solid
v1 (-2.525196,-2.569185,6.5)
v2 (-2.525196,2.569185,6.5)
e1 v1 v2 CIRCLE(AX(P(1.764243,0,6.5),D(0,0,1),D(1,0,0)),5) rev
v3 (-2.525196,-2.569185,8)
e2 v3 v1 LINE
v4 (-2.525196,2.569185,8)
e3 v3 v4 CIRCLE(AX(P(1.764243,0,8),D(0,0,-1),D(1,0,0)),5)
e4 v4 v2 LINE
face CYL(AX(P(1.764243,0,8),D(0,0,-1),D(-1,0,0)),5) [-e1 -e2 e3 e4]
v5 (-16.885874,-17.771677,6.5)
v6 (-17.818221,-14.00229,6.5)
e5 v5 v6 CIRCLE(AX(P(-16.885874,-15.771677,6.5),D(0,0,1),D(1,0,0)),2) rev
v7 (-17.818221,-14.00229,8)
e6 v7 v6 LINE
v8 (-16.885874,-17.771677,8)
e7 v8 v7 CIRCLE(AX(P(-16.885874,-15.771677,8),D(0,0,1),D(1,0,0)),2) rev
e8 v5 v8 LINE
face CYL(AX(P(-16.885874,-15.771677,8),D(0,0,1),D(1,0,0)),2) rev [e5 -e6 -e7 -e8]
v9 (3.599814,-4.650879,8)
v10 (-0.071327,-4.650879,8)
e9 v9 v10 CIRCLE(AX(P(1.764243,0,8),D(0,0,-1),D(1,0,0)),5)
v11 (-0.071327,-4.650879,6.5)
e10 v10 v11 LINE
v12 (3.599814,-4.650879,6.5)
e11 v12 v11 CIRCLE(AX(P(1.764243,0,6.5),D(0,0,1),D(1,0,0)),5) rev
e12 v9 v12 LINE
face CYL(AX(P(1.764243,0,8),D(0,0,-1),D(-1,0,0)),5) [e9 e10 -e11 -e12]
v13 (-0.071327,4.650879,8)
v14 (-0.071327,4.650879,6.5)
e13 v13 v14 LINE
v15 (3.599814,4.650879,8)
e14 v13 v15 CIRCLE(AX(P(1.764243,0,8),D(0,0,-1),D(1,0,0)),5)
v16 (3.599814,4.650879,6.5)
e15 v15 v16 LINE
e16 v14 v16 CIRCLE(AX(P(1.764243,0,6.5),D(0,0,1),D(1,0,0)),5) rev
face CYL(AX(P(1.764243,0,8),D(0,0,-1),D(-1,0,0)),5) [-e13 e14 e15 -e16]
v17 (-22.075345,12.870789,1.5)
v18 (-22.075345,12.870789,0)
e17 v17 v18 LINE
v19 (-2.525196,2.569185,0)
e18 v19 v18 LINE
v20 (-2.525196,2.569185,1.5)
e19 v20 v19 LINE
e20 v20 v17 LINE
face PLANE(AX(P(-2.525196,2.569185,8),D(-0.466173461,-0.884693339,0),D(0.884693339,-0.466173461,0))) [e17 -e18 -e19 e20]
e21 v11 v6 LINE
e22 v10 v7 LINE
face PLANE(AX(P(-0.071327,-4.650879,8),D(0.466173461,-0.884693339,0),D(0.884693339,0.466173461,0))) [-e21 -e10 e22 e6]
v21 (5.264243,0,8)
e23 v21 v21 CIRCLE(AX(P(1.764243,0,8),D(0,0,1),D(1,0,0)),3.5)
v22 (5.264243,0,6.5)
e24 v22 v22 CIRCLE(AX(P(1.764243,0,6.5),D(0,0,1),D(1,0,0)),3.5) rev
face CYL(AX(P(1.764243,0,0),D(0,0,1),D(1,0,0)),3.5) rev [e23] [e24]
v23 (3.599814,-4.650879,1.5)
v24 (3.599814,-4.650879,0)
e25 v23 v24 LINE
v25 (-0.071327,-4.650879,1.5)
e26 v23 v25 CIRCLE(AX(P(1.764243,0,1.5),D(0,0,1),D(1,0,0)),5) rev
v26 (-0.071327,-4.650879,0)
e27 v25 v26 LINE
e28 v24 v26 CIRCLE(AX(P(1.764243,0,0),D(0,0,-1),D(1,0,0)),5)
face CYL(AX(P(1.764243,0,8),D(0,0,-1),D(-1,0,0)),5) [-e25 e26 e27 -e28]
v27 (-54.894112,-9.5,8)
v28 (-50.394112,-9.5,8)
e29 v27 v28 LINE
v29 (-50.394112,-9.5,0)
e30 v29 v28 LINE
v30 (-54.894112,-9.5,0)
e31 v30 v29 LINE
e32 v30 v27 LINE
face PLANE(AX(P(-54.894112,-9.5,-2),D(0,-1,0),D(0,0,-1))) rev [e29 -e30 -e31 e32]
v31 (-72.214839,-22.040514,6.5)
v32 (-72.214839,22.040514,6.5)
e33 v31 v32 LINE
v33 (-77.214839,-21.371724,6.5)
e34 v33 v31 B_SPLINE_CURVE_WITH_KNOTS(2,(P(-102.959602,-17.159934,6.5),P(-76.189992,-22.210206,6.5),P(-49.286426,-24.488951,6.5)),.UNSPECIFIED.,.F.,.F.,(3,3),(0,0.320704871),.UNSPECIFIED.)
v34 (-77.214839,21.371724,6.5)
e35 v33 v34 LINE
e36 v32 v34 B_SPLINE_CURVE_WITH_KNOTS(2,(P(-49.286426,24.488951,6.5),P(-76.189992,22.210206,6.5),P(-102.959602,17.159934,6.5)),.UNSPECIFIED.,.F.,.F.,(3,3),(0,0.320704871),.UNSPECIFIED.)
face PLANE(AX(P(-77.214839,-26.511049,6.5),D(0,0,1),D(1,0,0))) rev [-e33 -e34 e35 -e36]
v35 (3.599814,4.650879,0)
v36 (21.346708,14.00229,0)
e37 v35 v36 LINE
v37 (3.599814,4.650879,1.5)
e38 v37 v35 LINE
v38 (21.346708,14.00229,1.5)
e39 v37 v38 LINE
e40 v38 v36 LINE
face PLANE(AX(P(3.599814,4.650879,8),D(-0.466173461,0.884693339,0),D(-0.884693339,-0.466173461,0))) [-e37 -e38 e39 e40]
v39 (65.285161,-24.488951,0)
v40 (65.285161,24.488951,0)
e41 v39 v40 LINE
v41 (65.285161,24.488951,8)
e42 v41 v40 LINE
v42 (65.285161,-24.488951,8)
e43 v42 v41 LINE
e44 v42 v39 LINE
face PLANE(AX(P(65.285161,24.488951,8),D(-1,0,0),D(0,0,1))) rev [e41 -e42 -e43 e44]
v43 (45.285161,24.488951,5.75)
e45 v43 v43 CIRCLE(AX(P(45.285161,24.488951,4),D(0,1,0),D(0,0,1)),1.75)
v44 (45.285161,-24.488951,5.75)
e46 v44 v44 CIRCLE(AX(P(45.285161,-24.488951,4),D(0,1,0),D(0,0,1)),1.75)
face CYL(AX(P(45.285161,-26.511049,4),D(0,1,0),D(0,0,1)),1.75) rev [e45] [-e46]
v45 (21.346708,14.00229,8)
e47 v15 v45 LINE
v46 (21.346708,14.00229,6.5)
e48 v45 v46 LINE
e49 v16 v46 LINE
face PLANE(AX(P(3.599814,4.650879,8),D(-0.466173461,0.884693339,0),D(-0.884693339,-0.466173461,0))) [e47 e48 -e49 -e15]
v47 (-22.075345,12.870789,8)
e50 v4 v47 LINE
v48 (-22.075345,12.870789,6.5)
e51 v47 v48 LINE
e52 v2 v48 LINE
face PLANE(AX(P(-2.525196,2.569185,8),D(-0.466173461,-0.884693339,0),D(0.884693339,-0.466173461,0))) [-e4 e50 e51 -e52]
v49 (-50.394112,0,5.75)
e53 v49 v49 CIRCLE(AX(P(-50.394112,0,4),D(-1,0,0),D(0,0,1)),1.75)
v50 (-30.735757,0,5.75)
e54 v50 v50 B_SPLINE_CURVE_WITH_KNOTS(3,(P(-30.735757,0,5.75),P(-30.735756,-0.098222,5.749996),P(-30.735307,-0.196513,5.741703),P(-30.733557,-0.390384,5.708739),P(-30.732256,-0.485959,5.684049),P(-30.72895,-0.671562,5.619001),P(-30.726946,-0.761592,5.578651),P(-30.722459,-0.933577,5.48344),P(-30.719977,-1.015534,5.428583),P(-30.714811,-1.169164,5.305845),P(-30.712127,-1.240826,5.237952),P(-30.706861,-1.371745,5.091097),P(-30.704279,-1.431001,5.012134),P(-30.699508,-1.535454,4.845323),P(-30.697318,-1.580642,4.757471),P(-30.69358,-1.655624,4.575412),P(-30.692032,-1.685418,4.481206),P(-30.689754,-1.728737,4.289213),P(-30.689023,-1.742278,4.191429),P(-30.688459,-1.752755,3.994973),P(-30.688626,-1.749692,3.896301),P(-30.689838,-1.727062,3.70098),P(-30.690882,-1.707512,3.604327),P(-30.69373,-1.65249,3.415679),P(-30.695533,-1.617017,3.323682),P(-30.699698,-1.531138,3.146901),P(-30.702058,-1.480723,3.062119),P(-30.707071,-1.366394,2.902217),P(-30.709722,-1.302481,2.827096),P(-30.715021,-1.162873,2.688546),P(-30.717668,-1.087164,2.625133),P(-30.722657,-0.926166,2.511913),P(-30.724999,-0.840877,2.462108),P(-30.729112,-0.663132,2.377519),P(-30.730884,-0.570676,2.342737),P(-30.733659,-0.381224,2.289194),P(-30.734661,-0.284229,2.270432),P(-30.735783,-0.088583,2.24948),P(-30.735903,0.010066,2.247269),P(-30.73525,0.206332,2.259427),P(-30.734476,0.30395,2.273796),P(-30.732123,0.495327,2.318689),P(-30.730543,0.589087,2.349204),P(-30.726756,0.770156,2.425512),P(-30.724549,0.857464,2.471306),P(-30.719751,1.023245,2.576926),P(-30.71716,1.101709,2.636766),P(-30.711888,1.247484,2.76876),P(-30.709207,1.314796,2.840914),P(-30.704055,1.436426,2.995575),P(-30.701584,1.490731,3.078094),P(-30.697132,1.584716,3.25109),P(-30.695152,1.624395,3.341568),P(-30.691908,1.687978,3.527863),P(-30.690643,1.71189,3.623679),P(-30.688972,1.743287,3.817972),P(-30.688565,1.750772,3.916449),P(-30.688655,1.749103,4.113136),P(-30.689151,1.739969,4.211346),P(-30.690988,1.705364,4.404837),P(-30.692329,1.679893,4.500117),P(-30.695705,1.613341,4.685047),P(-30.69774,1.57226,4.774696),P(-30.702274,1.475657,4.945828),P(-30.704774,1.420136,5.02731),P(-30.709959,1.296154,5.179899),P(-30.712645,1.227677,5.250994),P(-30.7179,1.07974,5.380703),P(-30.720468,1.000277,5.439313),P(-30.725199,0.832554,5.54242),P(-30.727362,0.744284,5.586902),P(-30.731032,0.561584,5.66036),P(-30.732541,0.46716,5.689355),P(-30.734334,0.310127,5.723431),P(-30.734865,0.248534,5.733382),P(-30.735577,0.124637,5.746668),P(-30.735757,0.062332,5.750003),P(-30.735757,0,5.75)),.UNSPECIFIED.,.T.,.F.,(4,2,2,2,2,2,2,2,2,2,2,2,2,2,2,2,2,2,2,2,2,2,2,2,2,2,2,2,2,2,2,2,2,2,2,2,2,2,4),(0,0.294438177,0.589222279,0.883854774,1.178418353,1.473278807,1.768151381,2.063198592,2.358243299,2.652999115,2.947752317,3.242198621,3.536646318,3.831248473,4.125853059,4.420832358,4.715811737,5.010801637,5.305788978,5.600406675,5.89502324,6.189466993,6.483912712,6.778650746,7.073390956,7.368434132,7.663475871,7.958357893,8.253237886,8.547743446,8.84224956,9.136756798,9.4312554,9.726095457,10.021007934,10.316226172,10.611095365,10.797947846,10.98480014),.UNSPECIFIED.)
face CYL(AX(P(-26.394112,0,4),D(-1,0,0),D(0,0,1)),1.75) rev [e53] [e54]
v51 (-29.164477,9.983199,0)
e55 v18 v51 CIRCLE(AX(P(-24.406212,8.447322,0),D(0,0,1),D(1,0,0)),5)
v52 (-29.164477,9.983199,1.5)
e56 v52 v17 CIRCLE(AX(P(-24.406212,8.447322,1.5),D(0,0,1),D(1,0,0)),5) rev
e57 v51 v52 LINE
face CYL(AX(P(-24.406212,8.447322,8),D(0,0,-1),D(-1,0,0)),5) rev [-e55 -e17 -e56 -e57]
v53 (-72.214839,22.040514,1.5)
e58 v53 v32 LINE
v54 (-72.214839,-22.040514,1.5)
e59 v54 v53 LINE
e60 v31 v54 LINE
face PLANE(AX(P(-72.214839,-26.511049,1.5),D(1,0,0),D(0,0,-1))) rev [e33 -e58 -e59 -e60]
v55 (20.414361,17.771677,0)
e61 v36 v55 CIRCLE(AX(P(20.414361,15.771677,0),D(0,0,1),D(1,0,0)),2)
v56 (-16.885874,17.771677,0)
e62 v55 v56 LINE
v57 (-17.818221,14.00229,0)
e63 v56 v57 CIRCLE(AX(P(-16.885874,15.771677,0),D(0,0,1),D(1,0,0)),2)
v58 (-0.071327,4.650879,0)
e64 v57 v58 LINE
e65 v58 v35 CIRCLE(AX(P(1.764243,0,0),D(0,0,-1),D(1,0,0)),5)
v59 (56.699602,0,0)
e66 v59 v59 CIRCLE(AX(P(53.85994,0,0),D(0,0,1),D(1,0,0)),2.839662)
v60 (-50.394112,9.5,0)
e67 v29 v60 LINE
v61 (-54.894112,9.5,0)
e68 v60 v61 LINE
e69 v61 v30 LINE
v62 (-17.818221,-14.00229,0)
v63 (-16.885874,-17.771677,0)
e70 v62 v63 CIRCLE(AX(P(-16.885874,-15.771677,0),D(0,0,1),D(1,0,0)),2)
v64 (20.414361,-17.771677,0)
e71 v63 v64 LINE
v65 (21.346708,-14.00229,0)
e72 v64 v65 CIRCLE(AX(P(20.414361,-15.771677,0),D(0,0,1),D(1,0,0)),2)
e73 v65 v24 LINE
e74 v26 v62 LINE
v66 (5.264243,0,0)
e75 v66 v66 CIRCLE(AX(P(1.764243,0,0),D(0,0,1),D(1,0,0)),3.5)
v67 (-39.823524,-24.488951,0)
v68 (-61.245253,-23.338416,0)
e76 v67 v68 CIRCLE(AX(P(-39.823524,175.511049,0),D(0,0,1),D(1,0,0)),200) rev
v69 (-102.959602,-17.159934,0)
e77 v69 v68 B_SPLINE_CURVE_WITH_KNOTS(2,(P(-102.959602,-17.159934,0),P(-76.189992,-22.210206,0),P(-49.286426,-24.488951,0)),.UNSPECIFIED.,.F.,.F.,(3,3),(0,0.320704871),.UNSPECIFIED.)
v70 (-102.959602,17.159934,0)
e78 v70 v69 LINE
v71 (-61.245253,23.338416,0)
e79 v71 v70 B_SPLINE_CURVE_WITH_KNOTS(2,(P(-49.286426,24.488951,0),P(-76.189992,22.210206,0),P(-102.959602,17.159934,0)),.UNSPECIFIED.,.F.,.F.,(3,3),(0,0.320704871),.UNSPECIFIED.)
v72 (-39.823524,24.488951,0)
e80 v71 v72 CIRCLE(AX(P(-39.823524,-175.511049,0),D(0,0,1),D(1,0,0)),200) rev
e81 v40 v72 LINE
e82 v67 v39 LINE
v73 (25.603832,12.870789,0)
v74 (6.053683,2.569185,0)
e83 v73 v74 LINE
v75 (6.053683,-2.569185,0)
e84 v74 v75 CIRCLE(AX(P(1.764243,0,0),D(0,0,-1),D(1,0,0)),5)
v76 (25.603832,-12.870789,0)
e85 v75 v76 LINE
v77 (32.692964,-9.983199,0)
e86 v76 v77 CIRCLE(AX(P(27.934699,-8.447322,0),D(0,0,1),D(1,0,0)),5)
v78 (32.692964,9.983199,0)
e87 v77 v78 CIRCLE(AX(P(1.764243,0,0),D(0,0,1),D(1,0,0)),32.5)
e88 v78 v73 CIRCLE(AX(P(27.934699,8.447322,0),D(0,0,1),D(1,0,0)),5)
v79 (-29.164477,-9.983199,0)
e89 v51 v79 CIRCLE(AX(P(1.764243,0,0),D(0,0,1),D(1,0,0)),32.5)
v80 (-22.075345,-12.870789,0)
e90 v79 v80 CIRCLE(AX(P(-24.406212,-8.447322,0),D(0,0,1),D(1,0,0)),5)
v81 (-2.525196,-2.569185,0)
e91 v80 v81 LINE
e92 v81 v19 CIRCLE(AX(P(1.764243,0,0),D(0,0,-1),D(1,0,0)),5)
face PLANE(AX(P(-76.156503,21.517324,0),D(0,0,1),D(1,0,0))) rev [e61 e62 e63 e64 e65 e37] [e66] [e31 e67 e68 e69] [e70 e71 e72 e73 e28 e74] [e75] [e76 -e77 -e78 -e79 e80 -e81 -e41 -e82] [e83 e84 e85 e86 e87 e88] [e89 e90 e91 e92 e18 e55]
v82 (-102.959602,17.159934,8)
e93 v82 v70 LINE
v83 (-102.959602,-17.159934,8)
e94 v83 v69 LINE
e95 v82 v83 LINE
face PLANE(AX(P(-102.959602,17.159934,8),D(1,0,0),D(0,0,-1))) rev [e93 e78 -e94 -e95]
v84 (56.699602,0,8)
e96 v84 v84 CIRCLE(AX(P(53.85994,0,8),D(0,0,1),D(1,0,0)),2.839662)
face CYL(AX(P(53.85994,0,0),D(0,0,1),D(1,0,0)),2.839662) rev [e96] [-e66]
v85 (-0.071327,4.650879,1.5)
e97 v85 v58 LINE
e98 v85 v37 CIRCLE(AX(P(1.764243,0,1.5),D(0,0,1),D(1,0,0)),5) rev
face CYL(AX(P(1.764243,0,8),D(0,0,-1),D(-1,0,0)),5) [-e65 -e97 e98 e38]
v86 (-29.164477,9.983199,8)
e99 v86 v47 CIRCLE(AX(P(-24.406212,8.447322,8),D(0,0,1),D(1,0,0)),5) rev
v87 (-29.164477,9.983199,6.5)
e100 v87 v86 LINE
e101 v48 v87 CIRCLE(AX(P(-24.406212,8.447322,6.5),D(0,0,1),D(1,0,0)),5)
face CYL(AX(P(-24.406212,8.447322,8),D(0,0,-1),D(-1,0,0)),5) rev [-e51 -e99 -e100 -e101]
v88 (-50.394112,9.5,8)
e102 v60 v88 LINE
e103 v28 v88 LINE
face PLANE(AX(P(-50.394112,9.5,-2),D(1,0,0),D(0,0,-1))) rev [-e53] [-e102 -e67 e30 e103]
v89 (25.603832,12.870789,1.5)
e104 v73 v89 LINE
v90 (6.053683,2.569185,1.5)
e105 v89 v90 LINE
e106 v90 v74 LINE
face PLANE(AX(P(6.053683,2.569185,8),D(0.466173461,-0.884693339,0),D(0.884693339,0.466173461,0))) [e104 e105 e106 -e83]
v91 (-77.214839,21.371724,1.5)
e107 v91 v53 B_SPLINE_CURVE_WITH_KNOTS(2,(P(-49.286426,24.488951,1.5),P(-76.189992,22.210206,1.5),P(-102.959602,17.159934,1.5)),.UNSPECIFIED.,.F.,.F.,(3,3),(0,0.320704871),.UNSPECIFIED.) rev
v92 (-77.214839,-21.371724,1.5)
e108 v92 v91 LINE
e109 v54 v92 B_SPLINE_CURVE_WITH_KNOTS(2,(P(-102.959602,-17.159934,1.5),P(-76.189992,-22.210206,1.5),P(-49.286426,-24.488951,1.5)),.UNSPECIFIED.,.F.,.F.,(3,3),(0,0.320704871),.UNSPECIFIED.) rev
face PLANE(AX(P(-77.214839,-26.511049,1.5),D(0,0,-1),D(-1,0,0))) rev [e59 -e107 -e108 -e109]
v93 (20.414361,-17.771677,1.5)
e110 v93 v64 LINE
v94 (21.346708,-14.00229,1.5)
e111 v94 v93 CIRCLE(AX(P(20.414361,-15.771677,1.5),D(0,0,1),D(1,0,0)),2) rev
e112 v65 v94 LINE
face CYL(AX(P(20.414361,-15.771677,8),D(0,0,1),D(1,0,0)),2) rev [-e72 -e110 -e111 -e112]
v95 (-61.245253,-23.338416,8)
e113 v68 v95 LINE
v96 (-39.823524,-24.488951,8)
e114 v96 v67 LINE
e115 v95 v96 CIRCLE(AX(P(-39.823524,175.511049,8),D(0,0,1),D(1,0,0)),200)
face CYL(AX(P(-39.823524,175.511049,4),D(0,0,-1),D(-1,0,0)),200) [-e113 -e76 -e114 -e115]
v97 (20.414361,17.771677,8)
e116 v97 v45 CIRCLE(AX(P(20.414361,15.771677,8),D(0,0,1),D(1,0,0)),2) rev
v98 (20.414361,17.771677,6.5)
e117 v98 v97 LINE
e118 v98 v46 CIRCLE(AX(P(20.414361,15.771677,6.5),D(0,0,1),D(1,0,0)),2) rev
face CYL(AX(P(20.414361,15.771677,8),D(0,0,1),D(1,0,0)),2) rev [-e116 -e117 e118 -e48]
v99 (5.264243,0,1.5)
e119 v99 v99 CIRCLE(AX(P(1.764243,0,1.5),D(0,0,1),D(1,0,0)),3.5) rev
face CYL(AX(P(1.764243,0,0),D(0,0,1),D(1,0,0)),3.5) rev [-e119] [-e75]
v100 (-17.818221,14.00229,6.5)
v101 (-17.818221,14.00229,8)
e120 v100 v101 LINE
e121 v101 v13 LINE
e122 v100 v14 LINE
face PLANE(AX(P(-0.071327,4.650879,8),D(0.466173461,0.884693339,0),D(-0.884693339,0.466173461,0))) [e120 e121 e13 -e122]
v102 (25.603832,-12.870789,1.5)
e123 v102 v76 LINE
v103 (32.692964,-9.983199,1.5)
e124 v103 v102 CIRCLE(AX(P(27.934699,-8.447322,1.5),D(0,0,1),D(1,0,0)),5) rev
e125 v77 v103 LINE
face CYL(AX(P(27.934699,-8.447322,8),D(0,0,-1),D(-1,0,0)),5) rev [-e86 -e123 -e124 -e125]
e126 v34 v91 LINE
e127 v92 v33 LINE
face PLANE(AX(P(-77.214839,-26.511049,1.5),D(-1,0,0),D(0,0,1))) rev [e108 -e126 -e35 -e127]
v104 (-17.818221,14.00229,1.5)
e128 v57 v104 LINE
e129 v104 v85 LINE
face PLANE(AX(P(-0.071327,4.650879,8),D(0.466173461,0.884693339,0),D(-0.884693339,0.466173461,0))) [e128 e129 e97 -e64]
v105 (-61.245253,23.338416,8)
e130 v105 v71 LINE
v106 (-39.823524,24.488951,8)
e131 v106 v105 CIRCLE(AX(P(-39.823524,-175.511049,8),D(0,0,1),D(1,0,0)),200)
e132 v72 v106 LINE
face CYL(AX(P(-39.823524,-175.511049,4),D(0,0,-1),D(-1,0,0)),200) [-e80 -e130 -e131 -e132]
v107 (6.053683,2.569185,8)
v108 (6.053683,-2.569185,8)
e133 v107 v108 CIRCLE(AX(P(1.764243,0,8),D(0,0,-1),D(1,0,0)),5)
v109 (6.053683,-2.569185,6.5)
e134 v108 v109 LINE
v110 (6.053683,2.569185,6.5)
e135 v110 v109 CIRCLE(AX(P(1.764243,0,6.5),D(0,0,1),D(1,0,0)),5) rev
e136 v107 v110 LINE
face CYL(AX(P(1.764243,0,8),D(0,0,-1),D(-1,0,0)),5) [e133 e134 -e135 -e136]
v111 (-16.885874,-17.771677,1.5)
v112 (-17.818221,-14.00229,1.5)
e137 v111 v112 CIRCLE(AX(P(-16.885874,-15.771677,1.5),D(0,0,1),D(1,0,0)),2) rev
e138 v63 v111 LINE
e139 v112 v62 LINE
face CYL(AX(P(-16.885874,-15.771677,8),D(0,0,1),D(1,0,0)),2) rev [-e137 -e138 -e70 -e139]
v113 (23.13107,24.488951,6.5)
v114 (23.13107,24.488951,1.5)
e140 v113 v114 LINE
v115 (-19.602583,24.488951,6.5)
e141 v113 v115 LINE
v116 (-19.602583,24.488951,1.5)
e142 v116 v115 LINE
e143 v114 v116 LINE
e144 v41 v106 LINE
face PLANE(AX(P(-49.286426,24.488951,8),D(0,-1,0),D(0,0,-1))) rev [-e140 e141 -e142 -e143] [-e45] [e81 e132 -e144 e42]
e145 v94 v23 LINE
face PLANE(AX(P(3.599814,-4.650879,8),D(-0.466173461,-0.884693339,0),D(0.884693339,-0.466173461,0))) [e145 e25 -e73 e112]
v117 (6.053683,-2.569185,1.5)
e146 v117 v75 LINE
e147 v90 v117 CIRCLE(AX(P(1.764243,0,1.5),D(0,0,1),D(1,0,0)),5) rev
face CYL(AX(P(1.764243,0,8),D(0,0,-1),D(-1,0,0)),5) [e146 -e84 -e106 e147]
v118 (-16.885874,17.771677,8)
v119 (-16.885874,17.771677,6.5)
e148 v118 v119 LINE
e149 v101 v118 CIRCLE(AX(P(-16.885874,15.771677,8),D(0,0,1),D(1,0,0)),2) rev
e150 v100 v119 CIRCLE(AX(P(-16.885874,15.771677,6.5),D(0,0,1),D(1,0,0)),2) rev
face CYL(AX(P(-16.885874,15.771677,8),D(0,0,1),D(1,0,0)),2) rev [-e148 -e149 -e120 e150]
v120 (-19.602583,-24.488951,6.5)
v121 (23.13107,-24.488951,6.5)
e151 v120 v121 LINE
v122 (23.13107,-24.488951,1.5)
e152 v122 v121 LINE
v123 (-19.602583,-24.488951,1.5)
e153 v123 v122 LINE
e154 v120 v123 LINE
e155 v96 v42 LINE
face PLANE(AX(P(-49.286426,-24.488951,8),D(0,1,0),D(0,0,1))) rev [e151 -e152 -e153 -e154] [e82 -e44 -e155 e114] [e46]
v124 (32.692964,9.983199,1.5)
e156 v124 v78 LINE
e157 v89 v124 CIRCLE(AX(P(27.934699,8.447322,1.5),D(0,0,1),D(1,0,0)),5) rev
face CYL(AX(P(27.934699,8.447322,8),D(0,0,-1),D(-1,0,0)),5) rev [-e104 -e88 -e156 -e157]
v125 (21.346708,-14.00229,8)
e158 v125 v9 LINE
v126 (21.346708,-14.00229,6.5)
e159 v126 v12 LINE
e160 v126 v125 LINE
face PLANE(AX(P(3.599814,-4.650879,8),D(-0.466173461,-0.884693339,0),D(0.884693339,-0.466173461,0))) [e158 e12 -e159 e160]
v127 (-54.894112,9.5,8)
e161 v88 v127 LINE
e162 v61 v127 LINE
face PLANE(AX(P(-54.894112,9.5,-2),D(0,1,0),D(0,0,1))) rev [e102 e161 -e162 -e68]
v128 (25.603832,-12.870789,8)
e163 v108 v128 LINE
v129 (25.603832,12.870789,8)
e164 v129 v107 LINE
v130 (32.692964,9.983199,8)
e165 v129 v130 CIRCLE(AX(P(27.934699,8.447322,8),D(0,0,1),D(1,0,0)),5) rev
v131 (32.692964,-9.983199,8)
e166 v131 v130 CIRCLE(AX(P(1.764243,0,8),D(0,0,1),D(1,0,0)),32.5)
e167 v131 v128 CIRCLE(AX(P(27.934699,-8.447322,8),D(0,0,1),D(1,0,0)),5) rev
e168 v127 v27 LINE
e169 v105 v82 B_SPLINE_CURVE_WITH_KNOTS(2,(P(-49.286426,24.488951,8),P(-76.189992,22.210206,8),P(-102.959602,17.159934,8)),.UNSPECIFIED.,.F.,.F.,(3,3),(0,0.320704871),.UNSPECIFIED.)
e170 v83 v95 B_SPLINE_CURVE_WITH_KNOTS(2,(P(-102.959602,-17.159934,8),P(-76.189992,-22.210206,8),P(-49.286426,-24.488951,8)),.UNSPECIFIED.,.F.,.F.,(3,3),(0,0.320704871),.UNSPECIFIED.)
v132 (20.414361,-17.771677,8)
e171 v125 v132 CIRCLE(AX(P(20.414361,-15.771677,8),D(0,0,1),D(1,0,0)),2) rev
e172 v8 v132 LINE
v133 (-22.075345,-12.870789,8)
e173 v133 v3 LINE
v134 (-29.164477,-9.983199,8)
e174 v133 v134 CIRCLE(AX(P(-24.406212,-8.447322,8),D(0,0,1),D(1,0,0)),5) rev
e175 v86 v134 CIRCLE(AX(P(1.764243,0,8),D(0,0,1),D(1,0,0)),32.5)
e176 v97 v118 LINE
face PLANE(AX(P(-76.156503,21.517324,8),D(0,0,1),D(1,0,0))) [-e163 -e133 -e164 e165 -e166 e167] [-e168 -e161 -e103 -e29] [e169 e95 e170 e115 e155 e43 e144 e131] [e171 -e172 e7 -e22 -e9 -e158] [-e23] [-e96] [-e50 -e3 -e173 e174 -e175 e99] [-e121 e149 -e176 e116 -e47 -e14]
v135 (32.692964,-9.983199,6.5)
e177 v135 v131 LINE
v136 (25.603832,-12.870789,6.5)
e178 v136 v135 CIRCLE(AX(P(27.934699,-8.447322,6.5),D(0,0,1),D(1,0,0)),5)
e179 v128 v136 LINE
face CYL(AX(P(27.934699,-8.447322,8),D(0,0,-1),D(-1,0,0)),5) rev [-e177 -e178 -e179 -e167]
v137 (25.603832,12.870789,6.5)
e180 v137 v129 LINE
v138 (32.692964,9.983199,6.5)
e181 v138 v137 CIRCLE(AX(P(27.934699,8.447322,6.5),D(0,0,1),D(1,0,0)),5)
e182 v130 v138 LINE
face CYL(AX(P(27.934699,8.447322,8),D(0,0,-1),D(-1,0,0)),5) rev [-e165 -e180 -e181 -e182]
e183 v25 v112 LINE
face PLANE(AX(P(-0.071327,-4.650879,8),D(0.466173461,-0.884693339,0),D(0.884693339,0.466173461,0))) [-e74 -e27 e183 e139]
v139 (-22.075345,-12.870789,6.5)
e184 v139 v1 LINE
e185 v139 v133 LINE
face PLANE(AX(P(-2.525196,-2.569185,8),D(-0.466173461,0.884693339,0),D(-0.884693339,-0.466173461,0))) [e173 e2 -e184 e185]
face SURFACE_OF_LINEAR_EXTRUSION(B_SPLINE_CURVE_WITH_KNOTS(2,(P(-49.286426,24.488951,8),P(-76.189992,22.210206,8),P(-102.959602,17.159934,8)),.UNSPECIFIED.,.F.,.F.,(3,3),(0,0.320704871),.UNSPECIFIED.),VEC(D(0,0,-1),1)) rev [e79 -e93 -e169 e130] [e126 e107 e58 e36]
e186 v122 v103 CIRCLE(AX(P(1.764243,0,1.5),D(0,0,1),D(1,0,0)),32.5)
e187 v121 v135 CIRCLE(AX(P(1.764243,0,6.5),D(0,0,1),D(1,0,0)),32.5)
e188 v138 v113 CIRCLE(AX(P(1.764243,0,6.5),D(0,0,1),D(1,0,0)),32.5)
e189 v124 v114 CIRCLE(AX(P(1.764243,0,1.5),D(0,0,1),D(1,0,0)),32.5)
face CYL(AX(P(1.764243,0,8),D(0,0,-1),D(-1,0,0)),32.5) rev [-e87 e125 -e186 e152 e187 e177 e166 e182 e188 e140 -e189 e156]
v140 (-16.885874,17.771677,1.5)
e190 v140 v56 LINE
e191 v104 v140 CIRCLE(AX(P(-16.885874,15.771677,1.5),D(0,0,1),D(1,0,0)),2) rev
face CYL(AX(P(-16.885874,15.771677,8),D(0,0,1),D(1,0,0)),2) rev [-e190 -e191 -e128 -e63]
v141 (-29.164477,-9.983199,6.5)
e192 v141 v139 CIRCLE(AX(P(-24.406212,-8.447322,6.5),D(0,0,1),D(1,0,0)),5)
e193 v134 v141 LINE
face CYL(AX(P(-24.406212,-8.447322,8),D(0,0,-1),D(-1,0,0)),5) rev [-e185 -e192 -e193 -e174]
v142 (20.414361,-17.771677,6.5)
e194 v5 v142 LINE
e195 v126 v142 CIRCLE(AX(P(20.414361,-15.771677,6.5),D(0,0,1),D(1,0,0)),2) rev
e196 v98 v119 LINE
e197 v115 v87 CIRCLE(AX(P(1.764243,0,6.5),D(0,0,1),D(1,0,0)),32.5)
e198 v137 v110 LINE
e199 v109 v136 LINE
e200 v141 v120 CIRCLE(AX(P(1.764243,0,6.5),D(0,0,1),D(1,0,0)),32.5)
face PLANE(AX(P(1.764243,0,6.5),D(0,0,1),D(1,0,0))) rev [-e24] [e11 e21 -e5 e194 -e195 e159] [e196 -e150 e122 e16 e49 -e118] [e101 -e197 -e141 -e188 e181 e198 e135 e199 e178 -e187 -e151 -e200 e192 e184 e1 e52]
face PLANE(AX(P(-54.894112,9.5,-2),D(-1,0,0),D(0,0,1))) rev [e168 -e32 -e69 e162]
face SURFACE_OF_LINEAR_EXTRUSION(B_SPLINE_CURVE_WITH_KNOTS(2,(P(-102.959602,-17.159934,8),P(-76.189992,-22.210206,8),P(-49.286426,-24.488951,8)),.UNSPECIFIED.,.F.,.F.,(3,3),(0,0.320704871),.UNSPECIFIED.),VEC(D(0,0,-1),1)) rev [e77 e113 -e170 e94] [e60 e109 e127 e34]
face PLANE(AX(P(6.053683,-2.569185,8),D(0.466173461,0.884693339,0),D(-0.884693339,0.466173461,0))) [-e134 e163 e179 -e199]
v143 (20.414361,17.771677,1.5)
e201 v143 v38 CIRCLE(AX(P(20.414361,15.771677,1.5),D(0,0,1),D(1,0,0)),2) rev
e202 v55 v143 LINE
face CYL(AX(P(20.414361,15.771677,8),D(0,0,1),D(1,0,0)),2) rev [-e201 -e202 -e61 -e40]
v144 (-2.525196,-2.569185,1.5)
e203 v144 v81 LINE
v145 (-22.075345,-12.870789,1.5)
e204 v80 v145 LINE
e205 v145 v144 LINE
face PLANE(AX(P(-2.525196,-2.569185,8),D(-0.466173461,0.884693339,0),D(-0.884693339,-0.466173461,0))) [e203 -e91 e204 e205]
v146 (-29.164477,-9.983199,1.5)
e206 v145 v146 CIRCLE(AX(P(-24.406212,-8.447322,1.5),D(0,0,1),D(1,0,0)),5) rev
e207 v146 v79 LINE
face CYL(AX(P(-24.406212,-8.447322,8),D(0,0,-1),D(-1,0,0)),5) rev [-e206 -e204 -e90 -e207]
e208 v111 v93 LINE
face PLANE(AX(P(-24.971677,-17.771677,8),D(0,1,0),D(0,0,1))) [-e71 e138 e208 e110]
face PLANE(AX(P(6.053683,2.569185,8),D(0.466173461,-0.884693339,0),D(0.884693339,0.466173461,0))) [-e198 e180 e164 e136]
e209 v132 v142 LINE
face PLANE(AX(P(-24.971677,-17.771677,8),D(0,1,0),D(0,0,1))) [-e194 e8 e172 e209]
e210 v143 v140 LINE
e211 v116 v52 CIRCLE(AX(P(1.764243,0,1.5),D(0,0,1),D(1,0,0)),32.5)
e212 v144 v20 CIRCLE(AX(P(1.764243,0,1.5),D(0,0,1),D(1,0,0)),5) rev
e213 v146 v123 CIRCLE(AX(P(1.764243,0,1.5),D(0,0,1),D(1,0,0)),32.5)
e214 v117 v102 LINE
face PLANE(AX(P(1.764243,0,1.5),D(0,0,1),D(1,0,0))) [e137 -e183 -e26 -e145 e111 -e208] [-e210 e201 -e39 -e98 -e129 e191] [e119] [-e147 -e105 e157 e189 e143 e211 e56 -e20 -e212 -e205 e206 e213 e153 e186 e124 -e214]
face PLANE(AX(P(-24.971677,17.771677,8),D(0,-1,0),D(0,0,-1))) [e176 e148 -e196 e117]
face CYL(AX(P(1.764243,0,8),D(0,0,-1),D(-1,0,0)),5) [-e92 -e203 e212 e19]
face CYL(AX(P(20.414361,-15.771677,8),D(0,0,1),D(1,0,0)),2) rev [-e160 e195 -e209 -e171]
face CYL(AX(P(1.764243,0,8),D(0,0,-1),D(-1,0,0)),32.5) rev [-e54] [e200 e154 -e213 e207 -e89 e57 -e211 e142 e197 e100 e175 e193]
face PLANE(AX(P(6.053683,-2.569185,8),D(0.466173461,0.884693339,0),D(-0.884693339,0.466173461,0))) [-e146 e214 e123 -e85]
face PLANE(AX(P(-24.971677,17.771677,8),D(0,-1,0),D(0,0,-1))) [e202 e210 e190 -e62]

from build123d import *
from build123d.topology import SkipClean

# Parameters (mm, degrees)
BOSS_EXTRUDE1_DEPTH     = 8
FILLET2_R               = 2
SKETCH3_R               = 2.839661977
CUT_EXTRUDE1_DEPTH      = 8
SKETCH4_R               = 3.5
CUT_EXTRUDE2_DEPTH      = 8
CUT_EXTRUDE3_DEPTH      = 2.5
CUT_EXTRUDE3_DEPTH_BACK = 2.5
SKETCH5_R               = 32.5
SKETCH6_W               = 4.5
SKETCH6_H               = 19
CUT_EXTRUDE4_DEPTH      = 10
SKETCH7_R               = 1.75
CUT_EXTRUDE5_DEPTH      = 51
FILLET3_START           = -1
FILLET3_DEPTH           = 10
FILLET4_START           = -1
FILLET4_DEPTH           = 10
SKETCH9_W               = 5
SKETCH9_H               = 5
CUT_EXTRUDE6_DEPTH      = 51
SKETCH10_R              = 1.75
CUT_EXTRUDE7_DEPTH      = 24
FILLET5_DEPTH           = 1.5
FILLET5_START           = 6.5
FILLET5_2_DEPTH         = 1.5


with BuildPart() as part:
    # Sketch2 → Boss-Extrude1 (new body)
    with BuildSketch(Plane.XY):
        with BuildLine():
            Line((-102.95960155, 17.159933592), (-102.95960155, -17.159933592))
            add(Edge.make_bspline(
                [(-102.95960155, -17.159933592), (-76.189992309, -22.210205625), (-49.286425804, -24.488951052)],
                knots=[0, 0, 0, 0.320704871, 0.320704871, 0.320704871], degree=2))
            Line((-49.286425804, -24.488951052), (65.285160882, -24.488951052))
            Line((65.285160882, -24.488951052), (65.285160882, 24.488951052))
            Line((65.285160882, 24.488951052), (-49.286425804, 24.488951052))
            add(Edge.make_bspline(
                [(-102.95960155, 17.159933592), (-76.189992309, 22.210205625), (-49.286425804, 24.488951052)],
                knots=[0, 0, 0, 0.320704871, 0.320704871, 0.320704871], degree=2))
        make_face()
        with BuildLine():
            Line((-24.971677166, 17.771677006), (28.500163837, 17.771677006))
            Line((28.500163837, 17.771677006), (3.599814154, 4.650879462))
            ThreePointArc((3.599814154, 4.650879462), (1.764243335, 5), (-0.071327484, 4.650879462))
            Line((-0.071327484, 4.650879462), (-24.971677166, 17.771677006))
        make_face(mode=Mode.SUBTRACT)
        with BuildLine():
            Line((3.599814154, -4.650879462), (28.500163837, -17.771677006))
            Line((28.500163837, -17.771677006), (-24.971677166, -17.771677006))
            Line((-24.971677166, -17.771677006), (-0.071327484, -4.650879462))
            ThreePointArc((-0.071327484, -4.650879462), (1.764243335, -5), (3.599814154, -4.650879462))
        make_face(mode=Mode.SUBTRACT)
        with BuildLine():
            Line((-2.525196045, 2.569184657), (-26.859859934, 15.391904107))
            ThreePointArc((-26.859859934, 15.391904107), (-30.735756665, 0), (-26.859859934, -15.391904107))
            Line((-26.859859934, -15.391904107), (-2.525196045, -2.569184657))
            ThreePointArc((-2.525196045, -2.569184657), (-3.235756665, 0), (-2.525196045, 2.569184657))
        make_face(mode=Mode.SUBTRACT)
        with BuildLine():
            Line((6.053682716, -2.569184657), (30.388346604, -15.391904107))
            ThreePointArc((30.388346604, -15.391904107), (34.264243335, 0), (30.388346604, 15.391904107))
            Line((30.388346604, 15.391904107), (6.053682716, 2.569184657))
            ThreePointArc((6.053682716, 2.569184657), (6.764243335, 0), (6.053682716, -2.569184657))
        make_face(mode=Mode.SUBTRACT)
    extrude(amount=BOSS_EXTRUDE1_DEPTH)

    # Fillet2
    fillet2_edges = [part.edges().sort_by_distance(p)[0] for p in [
        (-24.971677166, 17.771677006, 4),
        (28.500163837, 17.771677006, 4),
        (-24.971677166, -17.771677006, 4),
        (28.500163837, -17.771677006, 4),
    ]]
    fillet(fillet2_edges, radius=FILLET2_R)

    # Sketch3 → Cut-Extrude1 (cut)
    with BuildSketch(Plane.XY.offset(8)):
        with Locations((53.859940094, 0)):
            Circle(SKETCH3_R)
    extrude(amount=-CUT_EXTRUDE1_DEPTH, mode=Mode.SUBTRACT)

    # Sketch4 → Cut-Extrude2 (cut)
    with BuildSketch(Plane.XY.offset(8)):
        with Locations((1.764243335, 0)):
            Circle(SKETCH4_R)
    extrude(amount=-CUT_EXTRUDE2_DEPTH, mode=Mode.SUBTRACT)

    # Sketch5 → Cut-Extrude3 (cut, two sides: drawn at the far end of the back side and taken through both)
    with SkipClean():  # the faces are left unmerged after this step: merging them gives an invalid solid
        with BuildSketch(Plane.XY.offset(4).offset(-CUT_EXTRUDE3_DEPTH_BACK)):
            with Locations((1.764243335, 0)):
                Circle(SKETCH5_R)
        extrude(amount=CUT_EXTRUDE3_DEPTH + CUT_EXTRUDE3_DEPTH_BACK, mode=Mode.SUBTRACT)

    # Sketch6 → Cut-Extrude4 (cut)
    with SkipClean():  # the faces are left unmerged after this step: merging them gives an invalid solid
        with BuildSketch(Plane.XY.offset(8)):
            with Locations((-52.644112073, 0)):
                Rectangle(SKETCH6_W, SKETCH6_H)
        extrude(amount=-CUT_EXTRUDE4_DEPTH, mode=Mode.SUBTRACT)

    # Sketch7 → Cut-Extrude5 (cut)
    with SkipClean():  # the faces are left unmerged after this step: merging them gives an invalid solid
        with BuildSketch(Plane(origin=(0, 24.488951052, 0), x_dir=(1, 0, 0), z_dir=(0, 1, 0))):
            with Locations(Location((45.285160882, -4, 0), (0, 0, 270))):
                Circle(SKETCH7_R)
        extrude(amount=-CUT_EXTRUDE5_DEPTH, mode=Mode.SUBTRACT)

    # Fillet3: read off the stored shape, not the designer's step
    # Fillet3 outline → Fillet3 (cut)
    with SkipClean():  # the faces are left unmerged after this step: merging them gives an invalid solid
        with BuildSketch(Plane.XY.offset(FILLET3_START)):
            with BuildLine():
                add(Edge.make_bspline(
                    [(-49.286425804, 24.488951052), (-55.269151656, 23.982211205), (-61.245253134, 23.338415518)],
                    knots=[0, 0, 0, 0.071317285, 0.071317285, 0.071317285], degree=2))
                ThreePointArc((-61.245253134, 23.338415518), (-50.549825889, 24.201110037), (-39.823523948, 24.488951052))
                Line((-39.823523948, 24.488951052), (-49.286425804, 24.488951052))
            make_face()
        extrude(amount=FILLET3_DEPTH, mode=Mode.SUBTRACT)

    # Fillet4: read off the stored shape, not the designer's step
    # Fillet4 outline → Fillet4 (cut)
    with SkipClean():  # the faces are left unmerged after this step: merging them gives an invalid solid
        with BuildSketch(Plane.XY.offset(FILLET4_START)):
            with BuildLine():
                Line((-49.286425804, -24.488951052), (-39.823523948, -24.488951052))
                ThreePointArc((-39.823523948, -24.488951052), (-50.549825889, -24.201110037), (-61.245253134, -23.338415518))
                add(Edge.make_bspline(
                    [(-61.245253134, -23.338415518), (-55.269151656, -23.982211205), (-49.286425804, -24.488951052)],
                    knots=[0.249387586, 0.249387586, 0.249387586, 0.320704871, 0.320704871, 0.320704871], degree=2))
            make_face()
        extrude(amount=FILLET4_DEPTH, mode=Mode.SUBTRACT)

    # Sketch9 → Cut-Extrude6 (cut)
    with SkipClean():  # the faces are left unmerged after this step: merging them gives an invalid solid
        with BuildSketch(Plane(origin=(0, 24.488951052, 0), x_dir=(1, 0, 0), z_dir=(0, 1, 0))):
            with Locations((-74.714839118, -4)):
                Rectangle(SKETCH9_W, SKETCH9_H)
        extrude(amount=-CUT_EXTRUDE6_DEPTH, mode=Mode.SUBTRACT)

    # Sketch10 → Cut-Extrude7 (cut)
    with SkipClean():  # the faces are left unmerged after this step: merging them gives an invalid solid
        with BuildSketch(Plane.ZY.offset(50.394112073)):
            with Locations((4, 0)):
                Circle(SKETCH10_R)
        extrude(amount=-CUT_EXTRUDE7_DEPTH, mode=Mode.SUBTRACT)

    # Fillet5: read off the stored shape, not the designer's step
    # Fillet5 outline → Fillet5 (add)
    with SkipClean():  # the faces are left unmerged after this step: merging them gives an invalid solid
        with BuildSketch(Plane.XY):
            with BuildLine():
                Line((30.388346604, 15.391904107), (25.603831674, 12.87078884))
                ThreePointArc((25.603831674, 12.87078884), (29.820861326, 13.077915151), (32.692963641, 9.983198898))
                ThreePointArc((32.692963641, 9.983198898), (31.663210239, 12.739771507), (30.388346604, 15.391904107))
            make_face()
            with BuildLine():
                ThreePointArc((30.388346604, -15.391904107), (31.663210239, -12.739771507), (32.692963641, -9.983198898))
                ThreePointArc((32.692963641, -9.983198898), (29.820861326, -13.077915151), (25.603831674, -12.87078884))
                Line((25.603831674, -12.87078884), (30.388346604, -15.391904107))
            make_face()
            with BuildLine():
                Line((-26.859859934, -15.391904107), (-22.075345003, -12.87078884))
                ThreePointArc((-22.075345003, -12.87078884), (-26.292374655, -13.077915151), (-29.164476971, -9.983198898))
                ThreePointArc((-29.164476971, -9.983198898), (-28.134723569, -12.739771507), (-26.859859934, -15.391904107))
            make_face()
            with BuildLine():
                ThreePointArc((-26.859859934, 15.391904107), (-28.134723569, 12.739771507), (-29.164476971, 9.983198898))
                ThreePointArc((-29.164476971, 9.983198898), (-26.292374655, 13.077915151), (-22.075345003, 12.87078884))
                Line((-22.075345003, 12.87078884), (-26.859859934, 15.391904107))
            make_face()
        extrude(amount=FILLET5_DEPTH)

    # Fillet5 2 outline → Fillet5 2 (add)
    with SkipClean():  # the faces are left unmerged after this step: merging them gives an invalid solid
        with BuildSketch(Plane.XY.offset(FILLET5_START)):
            with BuildLine():
                Line((30.388346604, 15.391904107), (25.603831674, 12.87078884))
                ThreePointArc((25.603831674, 12.87078884), (29.820861326, 13.077915151), (32.692963641, 9.983198898))
                ThreePointArc((32.692963641, 9.983198898), (31.663210239, 12.739771507), (30.388346604, 15.391904107))
            make_face()
            with BuildLine():
                ThreePointArc((30.388346604, -15.391904107), (31.663210239, -12.739771507), (32.692963641, -9.983198898))
                ThreePointArc((32.692963641, -9.983198898), (29.820861326, -13.077915151), (25.603831674, -12.87078884))
                Line((25.603831674, -12.87078884), (30.388346604, -15.391904107))
            make_face()
            with BuildLine():
                Line((-26.859859934, -15.391904107), (-22.075345003, -12.87078884))
                ThreePointArc((-22.075345003, -12.87078884), (-26.292374655, -13.077915151), (-29.164476971, -9.983198898))
                ThreePointArc((-29.164476971, -9.983198898), (-28.134723569, -12.739771507), (-26.859859934, -15.391904107))
            make_face()
            with BuildLine():
                ThreePointArc((-26.859859934, 15.391904107), (-28.134723569, 12.739771507), (-29.164476971, 9.983198898))
                ThreePointArc((-29.164476971, 9.983198898), (-26.292374655, 13.077915151), (-22.075345003, 12.87078884))
                Line((-22.075345003, 12.87078884), (-26.859859934, 15.391904107))
            make_face()
        extrude(amount=FILLET5_2_DEPTH)


solid = part.part
